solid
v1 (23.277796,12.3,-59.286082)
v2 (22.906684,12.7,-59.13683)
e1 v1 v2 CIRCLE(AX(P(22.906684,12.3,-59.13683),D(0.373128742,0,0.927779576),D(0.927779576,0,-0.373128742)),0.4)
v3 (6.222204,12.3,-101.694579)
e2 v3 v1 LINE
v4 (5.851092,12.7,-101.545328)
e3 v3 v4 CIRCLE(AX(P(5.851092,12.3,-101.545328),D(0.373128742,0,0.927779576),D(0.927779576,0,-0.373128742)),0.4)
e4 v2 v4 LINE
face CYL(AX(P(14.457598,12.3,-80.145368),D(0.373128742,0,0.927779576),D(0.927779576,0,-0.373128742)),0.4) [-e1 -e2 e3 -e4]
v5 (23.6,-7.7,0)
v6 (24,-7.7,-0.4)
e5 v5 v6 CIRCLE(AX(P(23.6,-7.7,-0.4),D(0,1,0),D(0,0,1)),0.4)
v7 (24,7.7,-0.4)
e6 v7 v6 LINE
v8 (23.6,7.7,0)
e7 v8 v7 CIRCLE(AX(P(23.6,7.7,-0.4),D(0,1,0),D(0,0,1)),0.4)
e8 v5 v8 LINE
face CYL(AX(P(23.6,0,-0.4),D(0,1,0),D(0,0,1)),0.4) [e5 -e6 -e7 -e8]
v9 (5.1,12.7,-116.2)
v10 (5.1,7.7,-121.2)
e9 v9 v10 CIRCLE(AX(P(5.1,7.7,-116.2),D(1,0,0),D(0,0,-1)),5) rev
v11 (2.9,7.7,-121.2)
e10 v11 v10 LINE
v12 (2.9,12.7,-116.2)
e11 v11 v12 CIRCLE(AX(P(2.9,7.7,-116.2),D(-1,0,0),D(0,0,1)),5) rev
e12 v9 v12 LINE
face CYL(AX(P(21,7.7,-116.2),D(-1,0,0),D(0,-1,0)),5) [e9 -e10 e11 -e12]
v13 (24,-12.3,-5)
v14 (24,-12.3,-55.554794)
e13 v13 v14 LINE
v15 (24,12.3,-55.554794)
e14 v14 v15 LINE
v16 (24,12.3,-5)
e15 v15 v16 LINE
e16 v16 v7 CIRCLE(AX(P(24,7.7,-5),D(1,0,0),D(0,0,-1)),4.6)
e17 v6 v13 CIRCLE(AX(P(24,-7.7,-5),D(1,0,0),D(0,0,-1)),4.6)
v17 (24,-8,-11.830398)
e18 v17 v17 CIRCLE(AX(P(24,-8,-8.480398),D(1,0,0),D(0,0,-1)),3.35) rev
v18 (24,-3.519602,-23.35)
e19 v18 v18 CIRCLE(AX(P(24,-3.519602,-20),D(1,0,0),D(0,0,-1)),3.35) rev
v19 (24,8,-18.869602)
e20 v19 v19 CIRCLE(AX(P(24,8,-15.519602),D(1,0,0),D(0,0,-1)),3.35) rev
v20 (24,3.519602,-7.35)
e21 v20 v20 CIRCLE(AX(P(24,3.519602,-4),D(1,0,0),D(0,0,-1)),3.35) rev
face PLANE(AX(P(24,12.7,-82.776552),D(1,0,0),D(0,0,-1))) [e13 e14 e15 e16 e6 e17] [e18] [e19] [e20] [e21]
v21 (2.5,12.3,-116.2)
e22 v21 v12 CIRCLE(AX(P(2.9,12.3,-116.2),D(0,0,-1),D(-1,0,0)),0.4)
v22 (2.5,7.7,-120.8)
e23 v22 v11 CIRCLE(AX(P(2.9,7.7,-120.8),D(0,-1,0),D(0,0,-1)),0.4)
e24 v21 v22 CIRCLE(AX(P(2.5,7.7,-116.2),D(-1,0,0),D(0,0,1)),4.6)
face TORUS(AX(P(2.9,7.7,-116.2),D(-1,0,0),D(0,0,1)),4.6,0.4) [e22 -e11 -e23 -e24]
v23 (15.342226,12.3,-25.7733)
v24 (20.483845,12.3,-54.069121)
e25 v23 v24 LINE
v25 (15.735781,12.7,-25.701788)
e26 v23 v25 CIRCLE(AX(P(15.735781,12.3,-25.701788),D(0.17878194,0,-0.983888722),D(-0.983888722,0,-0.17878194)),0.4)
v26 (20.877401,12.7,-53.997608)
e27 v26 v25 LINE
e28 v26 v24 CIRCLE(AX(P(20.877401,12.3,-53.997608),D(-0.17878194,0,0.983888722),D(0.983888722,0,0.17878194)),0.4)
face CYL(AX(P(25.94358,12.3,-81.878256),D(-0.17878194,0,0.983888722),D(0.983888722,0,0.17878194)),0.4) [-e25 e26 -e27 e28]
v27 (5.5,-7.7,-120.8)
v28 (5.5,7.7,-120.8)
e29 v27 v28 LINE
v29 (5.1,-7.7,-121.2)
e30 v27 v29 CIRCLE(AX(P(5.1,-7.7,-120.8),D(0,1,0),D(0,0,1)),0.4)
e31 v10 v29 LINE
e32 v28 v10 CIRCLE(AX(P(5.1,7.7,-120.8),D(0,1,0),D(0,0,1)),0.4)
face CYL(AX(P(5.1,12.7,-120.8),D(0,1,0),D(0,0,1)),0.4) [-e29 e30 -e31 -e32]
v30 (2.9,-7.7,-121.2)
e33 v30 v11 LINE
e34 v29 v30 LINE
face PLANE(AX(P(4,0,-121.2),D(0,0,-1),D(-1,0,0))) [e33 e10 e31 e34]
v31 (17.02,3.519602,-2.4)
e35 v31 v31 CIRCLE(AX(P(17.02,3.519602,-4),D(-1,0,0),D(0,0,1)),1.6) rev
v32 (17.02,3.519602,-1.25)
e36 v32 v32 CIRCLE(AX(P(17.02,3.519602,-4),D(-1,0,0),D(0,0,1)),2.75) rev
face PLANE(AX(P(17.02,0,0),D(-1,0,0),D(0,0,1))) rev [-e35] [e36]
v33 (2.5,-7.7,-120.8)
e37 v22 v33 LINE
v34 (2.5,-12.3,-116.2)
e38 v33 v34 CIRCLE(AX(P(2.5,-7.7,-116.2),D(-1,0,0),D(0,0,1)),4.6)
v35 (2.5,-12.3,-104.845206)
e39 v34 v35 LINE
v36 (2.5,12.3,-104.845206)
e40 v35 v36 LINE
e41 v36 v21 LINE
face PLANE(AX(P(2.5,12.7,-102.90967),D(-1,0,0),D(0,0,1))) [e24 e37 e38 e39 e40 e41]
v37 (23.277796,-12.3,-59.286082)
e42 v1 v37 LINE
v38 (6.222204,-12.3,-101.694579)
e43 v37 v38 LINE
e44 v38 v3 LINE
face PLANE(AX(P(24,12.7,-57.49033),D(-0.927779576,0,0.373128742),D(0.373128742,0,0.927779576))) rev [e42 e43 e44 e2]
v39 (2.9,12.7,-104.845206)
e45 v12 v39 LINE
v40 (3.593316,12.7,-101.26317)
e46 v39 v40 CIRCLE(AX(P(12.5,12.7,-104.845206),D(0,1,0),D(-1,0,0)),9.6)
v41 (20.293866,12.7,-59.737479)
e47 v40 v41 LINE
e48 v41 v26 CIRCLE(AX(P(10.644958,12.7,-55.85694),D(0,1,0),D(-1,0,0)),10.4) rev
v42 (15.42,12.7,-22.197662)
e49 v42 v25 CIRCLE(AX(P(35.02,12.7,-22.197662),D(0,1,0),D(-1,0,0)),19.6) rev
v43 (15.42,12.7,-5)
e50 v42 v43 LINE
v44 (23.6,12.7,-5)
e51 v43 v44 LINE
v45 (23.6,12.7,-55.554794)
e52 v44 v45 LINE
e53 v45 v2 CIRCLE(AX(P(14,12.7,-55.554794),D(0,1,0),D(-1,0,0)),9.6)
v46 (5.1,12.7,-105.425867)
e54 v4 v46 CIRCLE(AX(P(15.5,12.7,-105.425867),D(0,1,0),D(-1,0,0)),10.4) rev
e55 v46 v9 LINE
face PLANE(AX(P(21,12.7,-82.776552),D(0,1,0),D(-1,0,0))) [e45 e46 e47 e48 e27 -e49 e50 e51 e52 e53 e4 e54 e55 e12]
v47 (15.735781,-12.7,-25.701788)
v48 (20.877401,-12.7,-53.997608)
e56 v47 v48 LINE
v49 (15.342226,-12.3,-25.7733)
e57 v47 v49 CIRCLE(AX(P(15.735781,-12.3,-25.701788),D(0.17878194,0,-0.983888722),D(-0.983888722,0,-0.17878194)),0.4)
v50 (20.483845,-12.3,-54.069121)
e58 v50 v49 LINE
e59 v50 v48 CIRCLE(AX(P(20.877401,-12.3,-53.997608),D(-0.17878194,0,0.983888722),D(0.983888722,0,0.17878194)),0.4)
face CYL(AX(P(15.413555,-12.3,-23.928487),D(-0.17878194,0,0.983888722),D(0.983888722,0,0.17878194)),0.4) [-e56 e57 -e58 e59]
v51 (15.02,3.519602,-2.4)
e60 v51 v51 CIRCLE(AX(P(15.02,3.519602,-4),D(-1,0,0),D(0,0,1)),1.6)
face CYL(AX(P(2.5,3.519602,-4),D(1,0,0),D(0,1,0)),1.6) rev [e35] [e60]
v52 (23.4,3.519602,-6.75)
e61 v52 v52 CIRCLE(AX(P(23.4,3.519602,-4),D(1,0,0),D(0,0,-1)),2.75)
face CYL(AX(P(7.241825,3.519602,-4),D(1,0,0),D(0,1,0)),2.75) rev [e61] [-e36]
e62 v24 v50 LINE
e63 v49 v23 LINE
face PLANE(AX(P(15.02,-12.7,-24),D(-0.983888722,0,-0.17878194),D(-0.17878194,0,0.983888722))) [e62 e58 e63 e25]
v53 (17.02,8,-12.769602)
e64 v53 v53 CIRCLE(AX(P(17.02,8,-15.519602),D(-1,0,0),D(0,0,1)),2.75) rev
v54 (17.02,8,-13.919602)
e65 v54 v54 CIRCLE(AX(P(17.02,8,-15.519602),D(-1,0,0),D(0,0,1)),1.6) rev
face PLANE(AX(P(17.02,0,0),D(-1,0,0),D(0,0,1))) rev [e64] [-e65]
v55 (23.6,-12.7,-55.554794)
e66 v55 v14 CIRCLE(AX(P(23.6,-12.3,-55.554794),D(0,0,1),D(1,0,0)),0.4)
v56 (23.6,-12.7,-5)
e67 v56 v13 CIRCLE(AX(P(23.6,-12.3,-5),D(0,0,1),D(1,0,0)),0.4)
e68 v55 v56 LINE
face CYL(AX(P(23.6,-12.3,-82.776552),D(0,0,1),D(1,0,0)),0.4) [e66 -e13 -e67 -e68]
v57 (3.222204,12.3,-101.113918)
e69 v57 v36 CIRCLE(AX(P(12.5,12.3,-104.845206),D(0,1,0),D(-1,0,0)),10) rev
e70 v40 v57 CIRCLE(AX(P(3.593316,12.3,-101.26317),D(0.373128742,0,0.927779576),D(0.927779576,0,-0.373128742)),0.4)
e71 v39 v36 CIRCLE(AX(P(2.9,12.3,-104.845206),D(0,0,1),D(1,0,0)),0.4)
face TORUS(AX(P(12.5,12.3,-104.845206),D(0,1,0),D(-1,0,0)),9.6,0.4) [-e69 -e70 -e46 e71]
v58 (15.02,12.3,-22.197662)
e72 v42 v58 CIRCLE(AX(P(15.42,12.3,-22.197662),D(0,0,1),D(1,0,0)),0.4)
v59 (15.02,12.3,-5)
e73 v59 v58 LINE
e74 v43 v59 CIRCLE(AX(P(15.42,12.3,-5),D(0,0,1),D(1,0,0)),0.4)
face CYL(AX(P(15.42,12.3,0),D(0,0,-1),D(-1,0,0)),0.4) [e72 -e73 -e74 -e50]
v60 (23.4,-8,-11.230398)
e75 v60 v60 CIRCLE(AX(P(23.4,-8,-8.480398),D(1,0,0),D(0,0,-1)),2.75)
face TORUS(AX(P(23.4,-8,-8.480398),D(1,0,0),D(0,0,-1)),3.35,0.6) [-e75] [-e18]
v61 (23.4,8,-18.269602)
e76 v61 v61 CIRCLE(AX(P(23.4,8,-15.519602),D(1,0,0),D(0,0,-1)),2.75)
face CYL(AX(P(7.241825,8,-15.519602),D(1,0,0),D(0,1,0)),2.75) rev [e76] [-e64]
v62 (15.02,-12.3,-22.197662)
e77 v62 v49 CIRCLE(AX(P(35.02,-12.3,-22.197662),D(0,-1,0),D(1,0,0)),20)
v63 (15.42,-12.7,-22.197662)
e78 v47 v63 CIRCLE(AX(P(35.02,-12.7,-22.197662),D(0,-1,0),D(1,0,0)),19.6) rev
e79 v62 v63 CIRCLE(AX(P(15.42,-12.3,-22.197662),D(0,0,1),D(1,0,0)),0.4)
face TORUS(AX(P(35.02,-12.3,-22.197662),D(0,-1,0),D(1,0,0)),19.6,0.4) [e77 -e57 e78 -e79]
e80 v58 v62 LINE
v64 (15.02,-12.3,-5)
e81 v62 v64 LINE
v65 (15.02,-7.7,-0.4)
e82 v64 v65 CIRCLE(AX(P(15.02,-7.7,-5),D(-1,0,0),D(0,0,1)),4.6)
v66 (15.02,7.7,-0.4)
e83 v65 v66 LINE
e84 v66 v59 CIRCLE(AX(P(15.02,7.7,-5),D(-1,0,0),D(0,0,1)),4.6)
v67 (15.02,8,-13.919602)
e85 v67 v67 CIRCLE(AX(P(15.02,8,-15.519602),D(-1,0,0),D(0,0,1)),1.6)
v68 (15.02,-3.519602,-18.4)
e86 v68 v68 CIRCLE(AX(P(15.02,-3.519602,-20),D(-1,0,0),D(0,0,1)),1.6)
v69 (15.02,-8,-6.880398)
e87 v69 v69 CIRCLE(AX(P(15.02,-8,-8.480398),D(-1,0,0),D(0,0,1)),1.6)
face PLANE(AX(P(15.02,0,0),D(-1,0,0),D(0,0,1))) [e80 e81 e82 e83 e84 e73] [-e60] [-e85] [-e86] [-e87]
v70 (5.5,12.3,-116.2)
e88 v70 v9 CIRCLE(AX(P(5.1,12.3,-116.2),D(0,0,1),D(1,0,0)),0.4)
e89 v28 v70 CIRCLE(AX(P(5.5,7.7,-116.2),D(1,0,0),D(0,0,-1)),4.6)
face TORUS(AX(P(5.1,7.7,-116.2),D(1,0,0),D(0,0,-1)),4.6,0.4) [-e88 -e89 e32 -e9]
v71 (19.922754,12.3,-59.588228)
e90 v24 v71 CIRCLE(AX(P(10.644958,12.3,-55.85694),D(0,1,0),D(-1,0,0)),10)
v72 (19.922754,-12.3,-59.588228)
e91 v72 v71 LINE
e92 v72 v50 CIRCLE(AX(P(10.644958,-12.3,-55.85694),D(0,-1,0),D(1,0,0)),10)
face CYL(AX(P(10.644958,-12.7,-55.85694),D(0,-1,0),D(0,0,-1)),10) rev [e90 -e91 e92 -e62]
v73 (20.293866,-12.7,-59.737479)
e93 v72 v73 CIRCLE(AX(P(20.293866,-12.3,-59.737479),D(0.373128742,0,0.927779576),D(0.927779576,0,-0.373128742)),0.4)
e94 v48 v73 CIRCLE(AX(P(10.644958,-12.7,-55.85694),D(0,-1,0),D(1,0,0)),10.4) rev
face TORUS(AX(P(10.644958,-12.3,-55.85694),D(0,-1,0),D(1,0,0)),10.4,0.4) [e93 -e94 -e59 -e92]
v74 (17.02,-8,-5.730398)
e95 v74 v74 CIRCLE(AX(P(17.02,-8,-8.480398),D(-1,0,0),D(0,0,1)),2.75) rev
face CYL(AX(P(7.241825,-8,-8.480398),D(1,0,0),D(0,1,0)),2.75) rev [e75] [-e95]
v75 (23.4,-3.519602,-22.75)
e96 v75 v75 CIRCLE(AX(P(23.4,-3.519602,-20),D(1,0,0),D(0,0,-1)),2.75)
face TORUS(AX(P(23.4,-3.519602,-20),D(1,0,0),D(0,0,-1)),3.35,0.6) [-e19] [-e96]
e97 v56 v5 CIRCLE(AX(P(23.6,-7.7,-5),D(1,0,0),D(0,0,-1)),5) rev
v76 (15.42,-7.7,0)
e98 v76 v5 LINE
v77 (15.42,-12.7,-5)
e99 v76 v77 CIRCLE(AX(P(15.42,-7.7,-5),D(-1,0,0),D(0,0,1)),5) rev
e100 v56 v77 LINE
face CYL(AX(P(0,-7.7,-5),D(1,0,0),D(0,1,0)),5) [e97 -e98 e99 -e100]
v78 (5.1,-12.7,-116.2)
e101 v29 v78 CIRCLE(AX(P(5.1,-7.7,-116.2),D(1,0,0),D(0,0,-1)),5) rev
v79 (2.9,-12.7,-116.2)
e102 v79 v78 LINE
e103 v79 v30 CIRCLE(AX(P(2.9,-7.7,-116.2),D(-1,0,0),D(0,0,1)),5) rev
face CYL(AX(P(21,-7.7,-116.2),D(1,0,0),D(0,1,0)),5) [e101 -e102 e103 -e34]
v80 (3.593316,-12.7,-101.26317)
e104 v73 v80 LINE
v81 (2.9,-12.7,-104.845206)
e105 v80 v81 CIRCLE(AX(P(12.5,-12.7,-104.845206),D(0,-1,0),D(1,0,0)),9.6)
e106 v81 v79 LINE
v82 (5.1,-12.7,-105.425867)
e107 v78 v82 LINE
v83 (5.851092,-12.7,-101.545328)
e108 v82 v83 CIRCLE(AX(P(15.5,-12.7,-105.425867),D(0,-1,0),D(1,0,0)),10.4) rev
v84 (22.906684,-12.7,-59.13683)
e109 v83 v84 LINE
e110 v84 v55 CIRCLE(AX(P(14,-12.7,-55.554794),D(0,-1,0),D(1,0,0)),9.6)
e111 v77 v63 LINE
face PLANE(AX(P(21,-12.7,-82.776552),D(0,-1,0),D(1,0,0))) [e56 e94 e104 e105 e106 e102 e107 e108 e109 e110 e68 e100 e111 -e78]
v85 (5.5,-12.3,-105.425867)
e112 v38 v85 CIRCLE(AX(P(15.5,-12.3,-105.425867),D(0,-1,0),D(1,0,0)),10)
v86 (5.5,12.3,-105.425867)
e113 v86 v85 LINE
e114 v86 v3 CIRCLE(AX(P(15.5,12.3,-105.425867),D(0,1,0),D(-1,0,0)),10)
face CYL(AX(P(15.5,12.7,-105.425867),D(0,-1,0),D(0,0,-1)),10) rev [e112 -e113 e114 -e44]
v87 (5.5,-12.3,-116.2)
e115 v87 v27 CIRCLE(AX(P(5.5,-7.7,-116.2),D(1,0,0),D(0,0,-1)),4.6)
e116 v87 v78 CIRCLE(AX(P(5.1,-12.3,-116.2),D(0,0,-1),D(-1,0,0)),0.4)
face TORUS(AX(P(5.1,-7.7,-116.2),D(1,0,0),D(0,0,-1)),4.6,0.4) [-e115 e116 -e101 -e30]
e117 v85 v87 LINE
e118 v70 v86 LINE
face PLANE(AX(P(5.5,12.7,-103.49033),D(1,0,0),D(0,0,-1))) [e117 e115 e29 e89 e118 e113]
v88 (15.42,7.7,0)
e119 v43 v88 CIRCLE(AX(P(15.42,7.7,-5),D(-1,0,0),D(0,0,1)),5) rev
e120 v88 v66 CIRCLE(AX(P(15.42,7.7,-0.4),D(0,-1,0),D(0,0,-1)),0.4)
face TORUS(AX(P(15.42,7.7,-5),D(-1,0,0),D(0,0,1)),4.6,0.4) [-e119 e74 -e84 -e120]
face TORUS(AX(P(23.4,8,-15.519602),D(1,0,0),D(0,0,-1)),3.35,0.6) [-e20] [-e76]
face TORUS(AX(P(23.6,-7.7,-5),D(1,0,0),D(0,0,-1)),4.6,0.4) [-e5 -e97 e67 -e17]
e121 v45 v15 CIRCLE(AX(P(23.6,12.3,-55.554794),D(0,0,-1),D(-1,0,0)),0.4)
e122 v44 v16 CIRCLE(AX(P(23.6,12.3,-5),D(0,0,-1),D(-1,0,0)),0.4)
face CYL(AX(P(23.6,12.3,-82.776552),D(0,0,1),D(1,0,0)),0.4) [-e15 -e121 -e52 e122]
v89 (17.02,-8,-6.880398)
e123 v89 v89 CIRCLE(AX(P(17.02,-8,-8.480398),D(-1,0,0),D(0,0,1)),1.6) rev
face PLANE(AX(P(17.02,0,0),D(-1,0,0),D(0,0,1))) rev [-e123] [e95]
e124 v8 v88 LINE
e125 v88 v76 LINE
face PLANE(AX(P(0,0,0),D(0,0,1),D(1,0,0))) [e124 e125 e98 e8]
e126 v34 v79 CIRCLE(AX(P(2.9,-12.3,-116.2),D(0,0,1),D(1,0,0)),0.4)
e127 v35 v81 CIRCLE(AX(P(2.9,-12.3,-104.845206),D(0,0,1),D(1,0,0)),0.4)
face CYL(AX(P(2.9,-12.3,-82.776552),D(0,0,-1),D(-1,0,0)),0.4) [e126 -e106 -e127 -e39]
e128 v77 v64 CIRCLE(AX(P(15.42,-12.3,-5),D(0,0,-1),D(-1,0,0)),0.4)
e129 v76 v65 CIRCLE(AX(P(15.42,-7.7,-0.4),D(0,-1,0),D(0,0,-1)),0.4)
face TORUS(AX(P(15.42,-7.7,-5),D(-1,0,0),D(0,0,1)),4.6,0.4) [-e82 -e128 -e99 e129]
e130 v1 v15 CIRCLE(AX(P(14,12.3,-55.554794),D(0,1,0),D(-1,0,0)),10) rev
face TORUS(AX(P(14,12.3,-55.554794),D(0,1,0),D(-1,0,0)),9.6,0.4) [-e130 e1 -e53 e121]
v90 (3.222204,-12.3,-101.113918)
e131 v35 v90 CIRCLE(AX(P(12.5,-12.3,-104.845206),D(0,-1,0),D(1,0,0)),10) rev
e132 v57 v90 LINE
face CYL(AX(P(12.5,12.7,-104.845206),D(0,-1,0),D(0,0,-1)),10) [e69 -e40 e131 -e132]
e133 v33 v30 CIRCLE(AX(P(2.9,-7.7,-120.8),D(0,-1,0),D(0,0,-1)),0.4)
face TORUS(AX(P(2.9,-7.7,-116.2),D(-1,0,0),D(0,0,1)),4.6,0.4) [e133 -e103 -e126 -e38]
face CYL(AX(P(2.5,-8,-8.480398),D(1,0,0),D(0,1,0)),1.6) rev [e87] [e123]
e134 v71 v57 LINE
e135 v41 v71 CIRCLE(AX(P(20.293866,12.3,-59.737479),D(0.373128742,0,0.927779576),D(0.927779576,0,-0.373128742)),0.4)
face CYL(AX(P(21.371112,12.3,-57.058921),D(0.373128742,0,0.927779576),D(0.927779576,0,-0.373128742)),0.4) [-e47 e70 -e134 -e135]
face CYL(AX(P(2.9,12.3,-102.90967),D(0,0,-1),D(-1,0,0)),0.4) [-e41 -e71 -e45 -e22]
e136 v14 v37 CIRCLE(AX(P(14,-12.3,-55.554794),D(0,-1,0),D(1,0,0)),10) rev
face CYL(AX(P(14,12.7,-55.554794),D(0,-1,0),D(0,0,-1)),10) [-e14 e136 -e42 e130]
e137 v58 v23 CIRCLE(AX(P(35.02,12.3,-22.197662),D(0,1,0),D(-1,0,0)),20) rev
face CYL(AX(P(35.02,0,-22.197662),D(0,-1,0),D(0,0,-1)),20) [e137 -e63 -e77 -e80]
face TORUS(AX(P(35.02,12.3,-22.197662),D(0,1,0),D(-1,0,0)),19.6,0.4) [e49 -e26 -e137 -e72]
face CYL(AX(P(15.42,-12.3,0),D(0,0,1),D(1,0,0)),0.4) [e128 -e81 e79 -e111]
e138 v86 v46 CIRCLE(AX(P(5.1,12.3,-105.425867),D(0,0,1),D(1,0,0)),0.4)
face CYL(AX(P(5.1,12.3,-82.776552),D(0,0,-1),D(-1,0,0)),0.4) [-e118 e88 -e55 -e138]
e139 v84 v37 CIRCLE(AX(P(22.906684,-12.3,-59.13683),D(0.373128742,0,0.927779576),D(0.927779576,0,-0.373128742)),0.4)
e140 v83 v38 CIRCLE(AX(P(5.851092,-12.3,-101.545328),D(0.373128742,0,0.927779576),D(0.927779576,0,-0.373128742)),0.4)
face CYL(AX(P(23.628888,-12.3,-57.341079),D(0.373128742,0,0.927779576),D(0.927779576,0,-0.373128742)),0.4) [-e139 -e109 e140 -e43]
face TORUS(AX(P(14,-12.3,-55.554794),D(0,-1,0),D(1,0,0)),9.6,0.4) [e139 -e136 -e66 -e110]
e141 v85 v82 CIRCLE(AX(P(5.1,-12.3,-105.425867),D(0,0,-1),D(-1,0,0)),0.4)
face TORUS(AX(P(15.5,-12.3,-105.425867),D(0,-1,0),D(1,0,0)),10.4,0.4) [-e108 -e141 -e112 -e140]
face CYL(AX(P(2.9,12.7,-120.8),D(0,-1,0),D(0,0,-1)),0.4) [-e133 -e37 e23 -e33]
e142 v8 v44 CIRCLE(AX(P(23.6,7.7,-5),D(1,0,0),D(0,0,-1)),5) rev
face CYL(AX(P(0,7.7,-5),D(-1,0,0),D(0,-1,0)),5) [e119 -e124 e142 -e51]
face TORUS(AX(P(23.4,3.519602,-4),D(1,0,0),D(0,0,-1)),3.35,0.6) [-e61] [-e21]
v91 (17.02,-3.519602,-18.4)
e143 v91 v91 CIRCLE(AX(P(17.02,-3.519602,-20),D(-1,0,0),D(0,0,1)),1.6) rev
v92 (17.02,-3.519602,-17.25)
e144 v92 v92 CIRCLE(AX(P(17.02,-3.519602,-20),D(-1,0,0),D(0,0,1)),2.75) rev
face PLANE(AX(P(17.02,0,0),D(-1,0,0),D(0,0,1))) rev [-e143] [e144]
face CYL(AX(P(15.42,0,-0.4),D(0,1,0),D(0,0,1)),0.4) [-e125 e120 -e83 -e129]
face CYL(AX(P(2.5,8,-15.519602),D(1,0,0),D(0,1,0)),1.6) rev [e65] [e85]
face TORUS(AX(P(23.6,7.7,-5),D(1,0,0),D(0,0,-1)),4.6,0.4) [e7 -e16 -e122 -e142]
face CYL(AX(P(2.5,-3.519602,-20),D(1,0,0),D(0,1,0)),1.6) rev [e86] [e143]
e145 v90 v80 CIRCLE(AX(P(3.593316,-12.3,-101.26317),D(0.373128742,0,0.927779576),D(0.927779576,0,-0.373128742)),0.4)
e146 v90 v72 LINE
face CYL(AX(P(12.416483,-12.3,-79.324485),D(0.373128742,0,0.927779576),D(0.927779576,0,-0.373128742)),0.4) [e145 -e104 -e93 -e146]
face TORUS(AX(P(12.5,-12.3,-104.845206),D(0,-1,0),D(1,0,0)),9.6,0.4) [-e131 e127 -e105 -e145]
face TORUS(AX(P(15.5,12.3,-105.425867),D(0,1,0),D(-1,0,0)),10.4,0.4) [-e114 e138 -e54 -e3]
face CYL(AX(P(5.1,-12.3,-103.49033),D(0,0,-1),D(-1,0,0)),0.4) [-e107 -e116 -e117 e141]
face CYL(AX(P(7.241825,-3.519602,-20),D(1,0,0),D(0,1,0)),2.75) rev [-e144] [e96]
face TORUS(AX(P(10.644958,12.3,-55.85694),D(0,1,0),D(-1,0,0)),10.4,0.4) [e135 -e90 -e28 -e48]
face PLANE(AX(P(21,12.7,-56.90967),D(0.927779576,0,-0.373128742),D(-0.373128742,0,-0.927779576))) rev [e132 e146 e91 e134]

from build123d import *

# Parameters (mm, degrees)
SKETCH1_W           = 3
SKETCH1_H           = 25.4
SKETCH3_R           = 1.6
CUT_EXTRUDE1_DEPTH  = 124.745626185
SKETCH4_W           = 24
SKETCH4_H           = 25.4
SKETCH4_R           = 1.6
BOSS_EXTRUDE1_DEPTH = 5.98
BOSS_EXTRUDE2_DEPTH = 25.4
FILLET1_R           = 5
FILLET2_R           = 10
FILLET3_R           = 0.4
SKETCH5_R           = 2.75
CUT_EXTRUDE2_DEPTH  = 6.98
FILLET7_R           = 20
FILLET8_R           = 0.6


with BuildPart() as part:
    # Sweep1: sweep along a path in Sketch2
    with BuildLine(Plane(origin=(0, 0, 0), x_dir=(1, 0, 0), z_dir=(0, 1, 0))) as sweep1_path:
        Line((22.5, 0), (22.5, 57.2))
        Line((22.5, 57.2), (4, 103.2))
        Line((4, 103.2), (4, 121.2))
    # Sketch1 → Sweep1 (sweep)
    with BuildSketch(Plane.XY):
        with Locations((22.5, 0)):
            Rectangle(SKETCH1_W, SKETCH1_H)
    sweep(path=sweep1_path.line, transition=Transition.RIGHT)

    # Sketch3 → Cut-Extrude1 (cut, through all)
    with BuildSketch(Plane(origin=(24, 0, 0), x_dir=(0, 0, -1), z_dir=(1, 0, 0))):
        with Locations(Location((4, 3.51960225, 0), (0, 0, 90))):
            Circle(SKETCH3_R)
        with Locations(Location((15.51960225, 8, 0), (0, 0, 90))):
            Circle(SKETCH3_R)
        with Locations(Location((20, -3.51960225, 0), (0, 0, 90))):
            Circle(SKETCH3_R)
        with Locations(Location((8.48039775, -8, 0), (0, 0, 90))):
            Circle(SKETCH3_R)
    extrude(amount=-CUT_EXTRUDE1_DEPTH, mode=Mode.SUBTRACT)

    # Sketch4 → Boss-Extrude1 (add)
    with BuildSketch(Plane.ZY.offset(-21)):
        with Locations((-12, 0)):
            Rectangle(SKETCH4_W, SKETCH4_H)
        with Locations(Location((-15.51960225, 8, 0), (0, 0, 90))):
            Circle(SKETCH4_R, mode=Mode.SUBTRACT)
        with Locations(Location((-20, -3.51960225, 0), (0, 0, 90))):
            Circle(SKETCH4_R, mode=Mode.SUBTRACT)
        with Locations(Location((-8.48039775, -8, 0), (0, 0, 90))):
            Circle(SKETCH4_R, mode=Mode.SUBTRACT)
        with Locations(Location((-4, 3.51960225, 0), (0, 0, 90))):
            Circle(SKETCH4_R, mode=Mode.SUBTRACT)
    extrude(amount=BOSS_EXTRUDE1_DEPTH)

    # Sketch6 → Boss-Extrude2 (add, through all)
    with BuildSketch(Plane(origin=(0, 12.7, 0), x_dir=(1, 0, 0), z_dir=(0, 1, 0))):
        Polygon((15.02, 24), (21, 56.909669549), (21, 24), align=None)
    extrude(amount=-BOSS_EXTRUDE2_DEPTH)

    # Fillet1
    fillet1_edges = [part.edges().sort_by_distance(p)[0] for p in [
        (4, -12.7, -121.2),
        (4, 12.7, -121.2),
        (19.51, -12.7, 0),
        (19.51, 12.7, 0),
    ]]
    fillet(fillet1_edges, radius=FILLET1_R)

    # Fillet2
    fillet2_edges = [part.edges().sort_by_distance(p)[0] for p in [
        (24, 0, -57.490330451),
        (21, 0, -56.909669549),
        (2.5, 0, -102.909669549),
        (5.5, 0, -103.490330451),
    ]]
    fillet(fillet2_edges, radius=FILLET2_R)

    # Fillet3
    fillet3_edges = [part.edges().sort_by_distance(p)[0] for p in [
        (24, 0, 0),
        (15.02, 0, 0),
        (15.02, 12.7, -14.5),
        (15.02, -11.235533906, -1.464466094),
        (15.02, 11.235533906, -1.464466094),
        (24, -11.235533906, -1.464466094),
        (24, 11.235533906, -1.464466094),
        (5.5, 0, -121.2),
        (5.5, 11.235533906, -119.735533906),
        (5.5, -11.235533906, -119.735533906),
        (2.5, 0, -121.2),
        (2.5, 11.235533906, -119.735533906),
        (2.5, -11.235533906, -119.735533906),
        (17.751922638, 12.7, -39.034560409),
        (17.751922638, -12.7, -39.034560409),
        (11.572479026, -12.7, -80.351073052),
        (11.572479026, 12.7, -80.351073052),
        (5.5, -12.7, -110.812933396),
        (5.5, 12.7, -110.812933396),
        (14.75, 12.7, -80.490330451),
        (14.75, -12.7, -80.490330451),
        (2.5, -12.7, -110.522602945),
        (2.5, 12.7, -110.522602945),
        (24, 12.7, -30.277397055),
        (23.817788896, 12.7, -57.45506283),
        (2.682211104, 12.7, -102.94493717),
        (24, -12.7, -30.277397055),
        (23.817788896, -12.7, -57.45506283),
        (2.682211104, -12.7, -102.94493717),
        (20.593677924, -12.7, -56.868361443),
        (20.593677924, 12.7, -56.868361443),
        (5.682211104, -12.7, -103.525598072),
        (5.682211104, 12.7, -103.525598072),
        (15.02, -12.7, -14.5),
    ]]
    fillet(fillet3_edges, radius=FILLET3_R)

    # Sketch5 → Cut-Extrude2 (cut)
    with BuildSketch(Plane(origin=(24, 0, 0), x_dir=(0, 0, -1), z_dir=(1, 0, 0))):
        with Locations(Location((4, 3.51960225, 0), (0, 0, 90))):
            Circle(SKETCH5_R)
        with Locations(Location((15.51960225, 8, 0), (0, 0, 90))):
            Circle(SKETCH5_R)
        with Locations(Location((20, -3.51960225, 0), (0, 0, 90))):
            Circle(SKETCH5_R)
        with Locations(Location((8.48039775, -8, 0), (0, 0, 90))):
            Circle(SKETCH5_R)
    extrude(amount=-CUT_EXTRUDE2_DEPTH, mode=Mode.SUBTRACT)

    # Fillet7
    # the kernel refuses this fillet: 20 mm, written as the material it takes off along each edge
    with BuildSketch(Plane(origin=(35.02, 12.7, -22.197661615), x_dir=(-0.9838887223692693, 0, -0.17878193978857884), z_dir=(0.17878193978857884, 0, -0.9838887223692693))) as fillet7_piece_1:
        with BuildLine():
            CenterArc((19.6, -0.4), 0.4, 0, 90)
            Line((20, -0.4), (20, 0))
            Line((20, 0), (19.6, 0))
        make_face()
    revolve(axis=Axis((35.02, 12.7, -22.197661615), (0, 1, 0)), revolution_arc=10.298819284, mode=Mode.SUBTRACT)
    with BuildSketch(Plane(origin=(35.02, -12.7, -22.197661615), x_dir=(-1, 0, 0), z_dir=(0, 0, 1))) as fillet7_piece_2:
        with BuildLine():
            CenterArc((19.6, -0.4), 0.4, 0, 90)
            Line((20, -0.4), (20, 0))
            Line((20, 0), (19.6, 0))
        make_face()
    revolve(axis=Axis((35.02, -12.7, -22.197661615), (0, -1, 0)), revolution_arc=10.298819284, mode=Mode.SUBTRACT)
    with BuildSketch(Plane(origin=(15.02, -12.7, -24), x_dir=(0, 0, 1), z_dir=(0, 1, 0))) as fillet7_piece_3:
        with BuildLine():
            CenterArc((FILLET7_R * 0.0901169192469, FILLET7_R), FILLET7_R, 259.701180716, 10.298819284)
            Line((-FILLET7_R * 0.0886650205417, FILLET7_R * 0.0161112776307), (0, 0))
            Line((0, 0), (FILLET7_R * 0.0901169192469, 0))
        make_face()
    extrude(amount=25.4, mode=Mode.SUBTRACT)

    # Fillet8
    fillet8_edges = [part.edges().sort_by_distance(p)[0] for p in [
        (24, 0.76960225, -4),
        (24, 5.25, -15.51960225),
        (24, -6.26960225, -20),
        (24, -10.75, -8.48039775),
    ]]
    fillet(fillet8_edges, radius=FILLET8_R)


solid = part.part
